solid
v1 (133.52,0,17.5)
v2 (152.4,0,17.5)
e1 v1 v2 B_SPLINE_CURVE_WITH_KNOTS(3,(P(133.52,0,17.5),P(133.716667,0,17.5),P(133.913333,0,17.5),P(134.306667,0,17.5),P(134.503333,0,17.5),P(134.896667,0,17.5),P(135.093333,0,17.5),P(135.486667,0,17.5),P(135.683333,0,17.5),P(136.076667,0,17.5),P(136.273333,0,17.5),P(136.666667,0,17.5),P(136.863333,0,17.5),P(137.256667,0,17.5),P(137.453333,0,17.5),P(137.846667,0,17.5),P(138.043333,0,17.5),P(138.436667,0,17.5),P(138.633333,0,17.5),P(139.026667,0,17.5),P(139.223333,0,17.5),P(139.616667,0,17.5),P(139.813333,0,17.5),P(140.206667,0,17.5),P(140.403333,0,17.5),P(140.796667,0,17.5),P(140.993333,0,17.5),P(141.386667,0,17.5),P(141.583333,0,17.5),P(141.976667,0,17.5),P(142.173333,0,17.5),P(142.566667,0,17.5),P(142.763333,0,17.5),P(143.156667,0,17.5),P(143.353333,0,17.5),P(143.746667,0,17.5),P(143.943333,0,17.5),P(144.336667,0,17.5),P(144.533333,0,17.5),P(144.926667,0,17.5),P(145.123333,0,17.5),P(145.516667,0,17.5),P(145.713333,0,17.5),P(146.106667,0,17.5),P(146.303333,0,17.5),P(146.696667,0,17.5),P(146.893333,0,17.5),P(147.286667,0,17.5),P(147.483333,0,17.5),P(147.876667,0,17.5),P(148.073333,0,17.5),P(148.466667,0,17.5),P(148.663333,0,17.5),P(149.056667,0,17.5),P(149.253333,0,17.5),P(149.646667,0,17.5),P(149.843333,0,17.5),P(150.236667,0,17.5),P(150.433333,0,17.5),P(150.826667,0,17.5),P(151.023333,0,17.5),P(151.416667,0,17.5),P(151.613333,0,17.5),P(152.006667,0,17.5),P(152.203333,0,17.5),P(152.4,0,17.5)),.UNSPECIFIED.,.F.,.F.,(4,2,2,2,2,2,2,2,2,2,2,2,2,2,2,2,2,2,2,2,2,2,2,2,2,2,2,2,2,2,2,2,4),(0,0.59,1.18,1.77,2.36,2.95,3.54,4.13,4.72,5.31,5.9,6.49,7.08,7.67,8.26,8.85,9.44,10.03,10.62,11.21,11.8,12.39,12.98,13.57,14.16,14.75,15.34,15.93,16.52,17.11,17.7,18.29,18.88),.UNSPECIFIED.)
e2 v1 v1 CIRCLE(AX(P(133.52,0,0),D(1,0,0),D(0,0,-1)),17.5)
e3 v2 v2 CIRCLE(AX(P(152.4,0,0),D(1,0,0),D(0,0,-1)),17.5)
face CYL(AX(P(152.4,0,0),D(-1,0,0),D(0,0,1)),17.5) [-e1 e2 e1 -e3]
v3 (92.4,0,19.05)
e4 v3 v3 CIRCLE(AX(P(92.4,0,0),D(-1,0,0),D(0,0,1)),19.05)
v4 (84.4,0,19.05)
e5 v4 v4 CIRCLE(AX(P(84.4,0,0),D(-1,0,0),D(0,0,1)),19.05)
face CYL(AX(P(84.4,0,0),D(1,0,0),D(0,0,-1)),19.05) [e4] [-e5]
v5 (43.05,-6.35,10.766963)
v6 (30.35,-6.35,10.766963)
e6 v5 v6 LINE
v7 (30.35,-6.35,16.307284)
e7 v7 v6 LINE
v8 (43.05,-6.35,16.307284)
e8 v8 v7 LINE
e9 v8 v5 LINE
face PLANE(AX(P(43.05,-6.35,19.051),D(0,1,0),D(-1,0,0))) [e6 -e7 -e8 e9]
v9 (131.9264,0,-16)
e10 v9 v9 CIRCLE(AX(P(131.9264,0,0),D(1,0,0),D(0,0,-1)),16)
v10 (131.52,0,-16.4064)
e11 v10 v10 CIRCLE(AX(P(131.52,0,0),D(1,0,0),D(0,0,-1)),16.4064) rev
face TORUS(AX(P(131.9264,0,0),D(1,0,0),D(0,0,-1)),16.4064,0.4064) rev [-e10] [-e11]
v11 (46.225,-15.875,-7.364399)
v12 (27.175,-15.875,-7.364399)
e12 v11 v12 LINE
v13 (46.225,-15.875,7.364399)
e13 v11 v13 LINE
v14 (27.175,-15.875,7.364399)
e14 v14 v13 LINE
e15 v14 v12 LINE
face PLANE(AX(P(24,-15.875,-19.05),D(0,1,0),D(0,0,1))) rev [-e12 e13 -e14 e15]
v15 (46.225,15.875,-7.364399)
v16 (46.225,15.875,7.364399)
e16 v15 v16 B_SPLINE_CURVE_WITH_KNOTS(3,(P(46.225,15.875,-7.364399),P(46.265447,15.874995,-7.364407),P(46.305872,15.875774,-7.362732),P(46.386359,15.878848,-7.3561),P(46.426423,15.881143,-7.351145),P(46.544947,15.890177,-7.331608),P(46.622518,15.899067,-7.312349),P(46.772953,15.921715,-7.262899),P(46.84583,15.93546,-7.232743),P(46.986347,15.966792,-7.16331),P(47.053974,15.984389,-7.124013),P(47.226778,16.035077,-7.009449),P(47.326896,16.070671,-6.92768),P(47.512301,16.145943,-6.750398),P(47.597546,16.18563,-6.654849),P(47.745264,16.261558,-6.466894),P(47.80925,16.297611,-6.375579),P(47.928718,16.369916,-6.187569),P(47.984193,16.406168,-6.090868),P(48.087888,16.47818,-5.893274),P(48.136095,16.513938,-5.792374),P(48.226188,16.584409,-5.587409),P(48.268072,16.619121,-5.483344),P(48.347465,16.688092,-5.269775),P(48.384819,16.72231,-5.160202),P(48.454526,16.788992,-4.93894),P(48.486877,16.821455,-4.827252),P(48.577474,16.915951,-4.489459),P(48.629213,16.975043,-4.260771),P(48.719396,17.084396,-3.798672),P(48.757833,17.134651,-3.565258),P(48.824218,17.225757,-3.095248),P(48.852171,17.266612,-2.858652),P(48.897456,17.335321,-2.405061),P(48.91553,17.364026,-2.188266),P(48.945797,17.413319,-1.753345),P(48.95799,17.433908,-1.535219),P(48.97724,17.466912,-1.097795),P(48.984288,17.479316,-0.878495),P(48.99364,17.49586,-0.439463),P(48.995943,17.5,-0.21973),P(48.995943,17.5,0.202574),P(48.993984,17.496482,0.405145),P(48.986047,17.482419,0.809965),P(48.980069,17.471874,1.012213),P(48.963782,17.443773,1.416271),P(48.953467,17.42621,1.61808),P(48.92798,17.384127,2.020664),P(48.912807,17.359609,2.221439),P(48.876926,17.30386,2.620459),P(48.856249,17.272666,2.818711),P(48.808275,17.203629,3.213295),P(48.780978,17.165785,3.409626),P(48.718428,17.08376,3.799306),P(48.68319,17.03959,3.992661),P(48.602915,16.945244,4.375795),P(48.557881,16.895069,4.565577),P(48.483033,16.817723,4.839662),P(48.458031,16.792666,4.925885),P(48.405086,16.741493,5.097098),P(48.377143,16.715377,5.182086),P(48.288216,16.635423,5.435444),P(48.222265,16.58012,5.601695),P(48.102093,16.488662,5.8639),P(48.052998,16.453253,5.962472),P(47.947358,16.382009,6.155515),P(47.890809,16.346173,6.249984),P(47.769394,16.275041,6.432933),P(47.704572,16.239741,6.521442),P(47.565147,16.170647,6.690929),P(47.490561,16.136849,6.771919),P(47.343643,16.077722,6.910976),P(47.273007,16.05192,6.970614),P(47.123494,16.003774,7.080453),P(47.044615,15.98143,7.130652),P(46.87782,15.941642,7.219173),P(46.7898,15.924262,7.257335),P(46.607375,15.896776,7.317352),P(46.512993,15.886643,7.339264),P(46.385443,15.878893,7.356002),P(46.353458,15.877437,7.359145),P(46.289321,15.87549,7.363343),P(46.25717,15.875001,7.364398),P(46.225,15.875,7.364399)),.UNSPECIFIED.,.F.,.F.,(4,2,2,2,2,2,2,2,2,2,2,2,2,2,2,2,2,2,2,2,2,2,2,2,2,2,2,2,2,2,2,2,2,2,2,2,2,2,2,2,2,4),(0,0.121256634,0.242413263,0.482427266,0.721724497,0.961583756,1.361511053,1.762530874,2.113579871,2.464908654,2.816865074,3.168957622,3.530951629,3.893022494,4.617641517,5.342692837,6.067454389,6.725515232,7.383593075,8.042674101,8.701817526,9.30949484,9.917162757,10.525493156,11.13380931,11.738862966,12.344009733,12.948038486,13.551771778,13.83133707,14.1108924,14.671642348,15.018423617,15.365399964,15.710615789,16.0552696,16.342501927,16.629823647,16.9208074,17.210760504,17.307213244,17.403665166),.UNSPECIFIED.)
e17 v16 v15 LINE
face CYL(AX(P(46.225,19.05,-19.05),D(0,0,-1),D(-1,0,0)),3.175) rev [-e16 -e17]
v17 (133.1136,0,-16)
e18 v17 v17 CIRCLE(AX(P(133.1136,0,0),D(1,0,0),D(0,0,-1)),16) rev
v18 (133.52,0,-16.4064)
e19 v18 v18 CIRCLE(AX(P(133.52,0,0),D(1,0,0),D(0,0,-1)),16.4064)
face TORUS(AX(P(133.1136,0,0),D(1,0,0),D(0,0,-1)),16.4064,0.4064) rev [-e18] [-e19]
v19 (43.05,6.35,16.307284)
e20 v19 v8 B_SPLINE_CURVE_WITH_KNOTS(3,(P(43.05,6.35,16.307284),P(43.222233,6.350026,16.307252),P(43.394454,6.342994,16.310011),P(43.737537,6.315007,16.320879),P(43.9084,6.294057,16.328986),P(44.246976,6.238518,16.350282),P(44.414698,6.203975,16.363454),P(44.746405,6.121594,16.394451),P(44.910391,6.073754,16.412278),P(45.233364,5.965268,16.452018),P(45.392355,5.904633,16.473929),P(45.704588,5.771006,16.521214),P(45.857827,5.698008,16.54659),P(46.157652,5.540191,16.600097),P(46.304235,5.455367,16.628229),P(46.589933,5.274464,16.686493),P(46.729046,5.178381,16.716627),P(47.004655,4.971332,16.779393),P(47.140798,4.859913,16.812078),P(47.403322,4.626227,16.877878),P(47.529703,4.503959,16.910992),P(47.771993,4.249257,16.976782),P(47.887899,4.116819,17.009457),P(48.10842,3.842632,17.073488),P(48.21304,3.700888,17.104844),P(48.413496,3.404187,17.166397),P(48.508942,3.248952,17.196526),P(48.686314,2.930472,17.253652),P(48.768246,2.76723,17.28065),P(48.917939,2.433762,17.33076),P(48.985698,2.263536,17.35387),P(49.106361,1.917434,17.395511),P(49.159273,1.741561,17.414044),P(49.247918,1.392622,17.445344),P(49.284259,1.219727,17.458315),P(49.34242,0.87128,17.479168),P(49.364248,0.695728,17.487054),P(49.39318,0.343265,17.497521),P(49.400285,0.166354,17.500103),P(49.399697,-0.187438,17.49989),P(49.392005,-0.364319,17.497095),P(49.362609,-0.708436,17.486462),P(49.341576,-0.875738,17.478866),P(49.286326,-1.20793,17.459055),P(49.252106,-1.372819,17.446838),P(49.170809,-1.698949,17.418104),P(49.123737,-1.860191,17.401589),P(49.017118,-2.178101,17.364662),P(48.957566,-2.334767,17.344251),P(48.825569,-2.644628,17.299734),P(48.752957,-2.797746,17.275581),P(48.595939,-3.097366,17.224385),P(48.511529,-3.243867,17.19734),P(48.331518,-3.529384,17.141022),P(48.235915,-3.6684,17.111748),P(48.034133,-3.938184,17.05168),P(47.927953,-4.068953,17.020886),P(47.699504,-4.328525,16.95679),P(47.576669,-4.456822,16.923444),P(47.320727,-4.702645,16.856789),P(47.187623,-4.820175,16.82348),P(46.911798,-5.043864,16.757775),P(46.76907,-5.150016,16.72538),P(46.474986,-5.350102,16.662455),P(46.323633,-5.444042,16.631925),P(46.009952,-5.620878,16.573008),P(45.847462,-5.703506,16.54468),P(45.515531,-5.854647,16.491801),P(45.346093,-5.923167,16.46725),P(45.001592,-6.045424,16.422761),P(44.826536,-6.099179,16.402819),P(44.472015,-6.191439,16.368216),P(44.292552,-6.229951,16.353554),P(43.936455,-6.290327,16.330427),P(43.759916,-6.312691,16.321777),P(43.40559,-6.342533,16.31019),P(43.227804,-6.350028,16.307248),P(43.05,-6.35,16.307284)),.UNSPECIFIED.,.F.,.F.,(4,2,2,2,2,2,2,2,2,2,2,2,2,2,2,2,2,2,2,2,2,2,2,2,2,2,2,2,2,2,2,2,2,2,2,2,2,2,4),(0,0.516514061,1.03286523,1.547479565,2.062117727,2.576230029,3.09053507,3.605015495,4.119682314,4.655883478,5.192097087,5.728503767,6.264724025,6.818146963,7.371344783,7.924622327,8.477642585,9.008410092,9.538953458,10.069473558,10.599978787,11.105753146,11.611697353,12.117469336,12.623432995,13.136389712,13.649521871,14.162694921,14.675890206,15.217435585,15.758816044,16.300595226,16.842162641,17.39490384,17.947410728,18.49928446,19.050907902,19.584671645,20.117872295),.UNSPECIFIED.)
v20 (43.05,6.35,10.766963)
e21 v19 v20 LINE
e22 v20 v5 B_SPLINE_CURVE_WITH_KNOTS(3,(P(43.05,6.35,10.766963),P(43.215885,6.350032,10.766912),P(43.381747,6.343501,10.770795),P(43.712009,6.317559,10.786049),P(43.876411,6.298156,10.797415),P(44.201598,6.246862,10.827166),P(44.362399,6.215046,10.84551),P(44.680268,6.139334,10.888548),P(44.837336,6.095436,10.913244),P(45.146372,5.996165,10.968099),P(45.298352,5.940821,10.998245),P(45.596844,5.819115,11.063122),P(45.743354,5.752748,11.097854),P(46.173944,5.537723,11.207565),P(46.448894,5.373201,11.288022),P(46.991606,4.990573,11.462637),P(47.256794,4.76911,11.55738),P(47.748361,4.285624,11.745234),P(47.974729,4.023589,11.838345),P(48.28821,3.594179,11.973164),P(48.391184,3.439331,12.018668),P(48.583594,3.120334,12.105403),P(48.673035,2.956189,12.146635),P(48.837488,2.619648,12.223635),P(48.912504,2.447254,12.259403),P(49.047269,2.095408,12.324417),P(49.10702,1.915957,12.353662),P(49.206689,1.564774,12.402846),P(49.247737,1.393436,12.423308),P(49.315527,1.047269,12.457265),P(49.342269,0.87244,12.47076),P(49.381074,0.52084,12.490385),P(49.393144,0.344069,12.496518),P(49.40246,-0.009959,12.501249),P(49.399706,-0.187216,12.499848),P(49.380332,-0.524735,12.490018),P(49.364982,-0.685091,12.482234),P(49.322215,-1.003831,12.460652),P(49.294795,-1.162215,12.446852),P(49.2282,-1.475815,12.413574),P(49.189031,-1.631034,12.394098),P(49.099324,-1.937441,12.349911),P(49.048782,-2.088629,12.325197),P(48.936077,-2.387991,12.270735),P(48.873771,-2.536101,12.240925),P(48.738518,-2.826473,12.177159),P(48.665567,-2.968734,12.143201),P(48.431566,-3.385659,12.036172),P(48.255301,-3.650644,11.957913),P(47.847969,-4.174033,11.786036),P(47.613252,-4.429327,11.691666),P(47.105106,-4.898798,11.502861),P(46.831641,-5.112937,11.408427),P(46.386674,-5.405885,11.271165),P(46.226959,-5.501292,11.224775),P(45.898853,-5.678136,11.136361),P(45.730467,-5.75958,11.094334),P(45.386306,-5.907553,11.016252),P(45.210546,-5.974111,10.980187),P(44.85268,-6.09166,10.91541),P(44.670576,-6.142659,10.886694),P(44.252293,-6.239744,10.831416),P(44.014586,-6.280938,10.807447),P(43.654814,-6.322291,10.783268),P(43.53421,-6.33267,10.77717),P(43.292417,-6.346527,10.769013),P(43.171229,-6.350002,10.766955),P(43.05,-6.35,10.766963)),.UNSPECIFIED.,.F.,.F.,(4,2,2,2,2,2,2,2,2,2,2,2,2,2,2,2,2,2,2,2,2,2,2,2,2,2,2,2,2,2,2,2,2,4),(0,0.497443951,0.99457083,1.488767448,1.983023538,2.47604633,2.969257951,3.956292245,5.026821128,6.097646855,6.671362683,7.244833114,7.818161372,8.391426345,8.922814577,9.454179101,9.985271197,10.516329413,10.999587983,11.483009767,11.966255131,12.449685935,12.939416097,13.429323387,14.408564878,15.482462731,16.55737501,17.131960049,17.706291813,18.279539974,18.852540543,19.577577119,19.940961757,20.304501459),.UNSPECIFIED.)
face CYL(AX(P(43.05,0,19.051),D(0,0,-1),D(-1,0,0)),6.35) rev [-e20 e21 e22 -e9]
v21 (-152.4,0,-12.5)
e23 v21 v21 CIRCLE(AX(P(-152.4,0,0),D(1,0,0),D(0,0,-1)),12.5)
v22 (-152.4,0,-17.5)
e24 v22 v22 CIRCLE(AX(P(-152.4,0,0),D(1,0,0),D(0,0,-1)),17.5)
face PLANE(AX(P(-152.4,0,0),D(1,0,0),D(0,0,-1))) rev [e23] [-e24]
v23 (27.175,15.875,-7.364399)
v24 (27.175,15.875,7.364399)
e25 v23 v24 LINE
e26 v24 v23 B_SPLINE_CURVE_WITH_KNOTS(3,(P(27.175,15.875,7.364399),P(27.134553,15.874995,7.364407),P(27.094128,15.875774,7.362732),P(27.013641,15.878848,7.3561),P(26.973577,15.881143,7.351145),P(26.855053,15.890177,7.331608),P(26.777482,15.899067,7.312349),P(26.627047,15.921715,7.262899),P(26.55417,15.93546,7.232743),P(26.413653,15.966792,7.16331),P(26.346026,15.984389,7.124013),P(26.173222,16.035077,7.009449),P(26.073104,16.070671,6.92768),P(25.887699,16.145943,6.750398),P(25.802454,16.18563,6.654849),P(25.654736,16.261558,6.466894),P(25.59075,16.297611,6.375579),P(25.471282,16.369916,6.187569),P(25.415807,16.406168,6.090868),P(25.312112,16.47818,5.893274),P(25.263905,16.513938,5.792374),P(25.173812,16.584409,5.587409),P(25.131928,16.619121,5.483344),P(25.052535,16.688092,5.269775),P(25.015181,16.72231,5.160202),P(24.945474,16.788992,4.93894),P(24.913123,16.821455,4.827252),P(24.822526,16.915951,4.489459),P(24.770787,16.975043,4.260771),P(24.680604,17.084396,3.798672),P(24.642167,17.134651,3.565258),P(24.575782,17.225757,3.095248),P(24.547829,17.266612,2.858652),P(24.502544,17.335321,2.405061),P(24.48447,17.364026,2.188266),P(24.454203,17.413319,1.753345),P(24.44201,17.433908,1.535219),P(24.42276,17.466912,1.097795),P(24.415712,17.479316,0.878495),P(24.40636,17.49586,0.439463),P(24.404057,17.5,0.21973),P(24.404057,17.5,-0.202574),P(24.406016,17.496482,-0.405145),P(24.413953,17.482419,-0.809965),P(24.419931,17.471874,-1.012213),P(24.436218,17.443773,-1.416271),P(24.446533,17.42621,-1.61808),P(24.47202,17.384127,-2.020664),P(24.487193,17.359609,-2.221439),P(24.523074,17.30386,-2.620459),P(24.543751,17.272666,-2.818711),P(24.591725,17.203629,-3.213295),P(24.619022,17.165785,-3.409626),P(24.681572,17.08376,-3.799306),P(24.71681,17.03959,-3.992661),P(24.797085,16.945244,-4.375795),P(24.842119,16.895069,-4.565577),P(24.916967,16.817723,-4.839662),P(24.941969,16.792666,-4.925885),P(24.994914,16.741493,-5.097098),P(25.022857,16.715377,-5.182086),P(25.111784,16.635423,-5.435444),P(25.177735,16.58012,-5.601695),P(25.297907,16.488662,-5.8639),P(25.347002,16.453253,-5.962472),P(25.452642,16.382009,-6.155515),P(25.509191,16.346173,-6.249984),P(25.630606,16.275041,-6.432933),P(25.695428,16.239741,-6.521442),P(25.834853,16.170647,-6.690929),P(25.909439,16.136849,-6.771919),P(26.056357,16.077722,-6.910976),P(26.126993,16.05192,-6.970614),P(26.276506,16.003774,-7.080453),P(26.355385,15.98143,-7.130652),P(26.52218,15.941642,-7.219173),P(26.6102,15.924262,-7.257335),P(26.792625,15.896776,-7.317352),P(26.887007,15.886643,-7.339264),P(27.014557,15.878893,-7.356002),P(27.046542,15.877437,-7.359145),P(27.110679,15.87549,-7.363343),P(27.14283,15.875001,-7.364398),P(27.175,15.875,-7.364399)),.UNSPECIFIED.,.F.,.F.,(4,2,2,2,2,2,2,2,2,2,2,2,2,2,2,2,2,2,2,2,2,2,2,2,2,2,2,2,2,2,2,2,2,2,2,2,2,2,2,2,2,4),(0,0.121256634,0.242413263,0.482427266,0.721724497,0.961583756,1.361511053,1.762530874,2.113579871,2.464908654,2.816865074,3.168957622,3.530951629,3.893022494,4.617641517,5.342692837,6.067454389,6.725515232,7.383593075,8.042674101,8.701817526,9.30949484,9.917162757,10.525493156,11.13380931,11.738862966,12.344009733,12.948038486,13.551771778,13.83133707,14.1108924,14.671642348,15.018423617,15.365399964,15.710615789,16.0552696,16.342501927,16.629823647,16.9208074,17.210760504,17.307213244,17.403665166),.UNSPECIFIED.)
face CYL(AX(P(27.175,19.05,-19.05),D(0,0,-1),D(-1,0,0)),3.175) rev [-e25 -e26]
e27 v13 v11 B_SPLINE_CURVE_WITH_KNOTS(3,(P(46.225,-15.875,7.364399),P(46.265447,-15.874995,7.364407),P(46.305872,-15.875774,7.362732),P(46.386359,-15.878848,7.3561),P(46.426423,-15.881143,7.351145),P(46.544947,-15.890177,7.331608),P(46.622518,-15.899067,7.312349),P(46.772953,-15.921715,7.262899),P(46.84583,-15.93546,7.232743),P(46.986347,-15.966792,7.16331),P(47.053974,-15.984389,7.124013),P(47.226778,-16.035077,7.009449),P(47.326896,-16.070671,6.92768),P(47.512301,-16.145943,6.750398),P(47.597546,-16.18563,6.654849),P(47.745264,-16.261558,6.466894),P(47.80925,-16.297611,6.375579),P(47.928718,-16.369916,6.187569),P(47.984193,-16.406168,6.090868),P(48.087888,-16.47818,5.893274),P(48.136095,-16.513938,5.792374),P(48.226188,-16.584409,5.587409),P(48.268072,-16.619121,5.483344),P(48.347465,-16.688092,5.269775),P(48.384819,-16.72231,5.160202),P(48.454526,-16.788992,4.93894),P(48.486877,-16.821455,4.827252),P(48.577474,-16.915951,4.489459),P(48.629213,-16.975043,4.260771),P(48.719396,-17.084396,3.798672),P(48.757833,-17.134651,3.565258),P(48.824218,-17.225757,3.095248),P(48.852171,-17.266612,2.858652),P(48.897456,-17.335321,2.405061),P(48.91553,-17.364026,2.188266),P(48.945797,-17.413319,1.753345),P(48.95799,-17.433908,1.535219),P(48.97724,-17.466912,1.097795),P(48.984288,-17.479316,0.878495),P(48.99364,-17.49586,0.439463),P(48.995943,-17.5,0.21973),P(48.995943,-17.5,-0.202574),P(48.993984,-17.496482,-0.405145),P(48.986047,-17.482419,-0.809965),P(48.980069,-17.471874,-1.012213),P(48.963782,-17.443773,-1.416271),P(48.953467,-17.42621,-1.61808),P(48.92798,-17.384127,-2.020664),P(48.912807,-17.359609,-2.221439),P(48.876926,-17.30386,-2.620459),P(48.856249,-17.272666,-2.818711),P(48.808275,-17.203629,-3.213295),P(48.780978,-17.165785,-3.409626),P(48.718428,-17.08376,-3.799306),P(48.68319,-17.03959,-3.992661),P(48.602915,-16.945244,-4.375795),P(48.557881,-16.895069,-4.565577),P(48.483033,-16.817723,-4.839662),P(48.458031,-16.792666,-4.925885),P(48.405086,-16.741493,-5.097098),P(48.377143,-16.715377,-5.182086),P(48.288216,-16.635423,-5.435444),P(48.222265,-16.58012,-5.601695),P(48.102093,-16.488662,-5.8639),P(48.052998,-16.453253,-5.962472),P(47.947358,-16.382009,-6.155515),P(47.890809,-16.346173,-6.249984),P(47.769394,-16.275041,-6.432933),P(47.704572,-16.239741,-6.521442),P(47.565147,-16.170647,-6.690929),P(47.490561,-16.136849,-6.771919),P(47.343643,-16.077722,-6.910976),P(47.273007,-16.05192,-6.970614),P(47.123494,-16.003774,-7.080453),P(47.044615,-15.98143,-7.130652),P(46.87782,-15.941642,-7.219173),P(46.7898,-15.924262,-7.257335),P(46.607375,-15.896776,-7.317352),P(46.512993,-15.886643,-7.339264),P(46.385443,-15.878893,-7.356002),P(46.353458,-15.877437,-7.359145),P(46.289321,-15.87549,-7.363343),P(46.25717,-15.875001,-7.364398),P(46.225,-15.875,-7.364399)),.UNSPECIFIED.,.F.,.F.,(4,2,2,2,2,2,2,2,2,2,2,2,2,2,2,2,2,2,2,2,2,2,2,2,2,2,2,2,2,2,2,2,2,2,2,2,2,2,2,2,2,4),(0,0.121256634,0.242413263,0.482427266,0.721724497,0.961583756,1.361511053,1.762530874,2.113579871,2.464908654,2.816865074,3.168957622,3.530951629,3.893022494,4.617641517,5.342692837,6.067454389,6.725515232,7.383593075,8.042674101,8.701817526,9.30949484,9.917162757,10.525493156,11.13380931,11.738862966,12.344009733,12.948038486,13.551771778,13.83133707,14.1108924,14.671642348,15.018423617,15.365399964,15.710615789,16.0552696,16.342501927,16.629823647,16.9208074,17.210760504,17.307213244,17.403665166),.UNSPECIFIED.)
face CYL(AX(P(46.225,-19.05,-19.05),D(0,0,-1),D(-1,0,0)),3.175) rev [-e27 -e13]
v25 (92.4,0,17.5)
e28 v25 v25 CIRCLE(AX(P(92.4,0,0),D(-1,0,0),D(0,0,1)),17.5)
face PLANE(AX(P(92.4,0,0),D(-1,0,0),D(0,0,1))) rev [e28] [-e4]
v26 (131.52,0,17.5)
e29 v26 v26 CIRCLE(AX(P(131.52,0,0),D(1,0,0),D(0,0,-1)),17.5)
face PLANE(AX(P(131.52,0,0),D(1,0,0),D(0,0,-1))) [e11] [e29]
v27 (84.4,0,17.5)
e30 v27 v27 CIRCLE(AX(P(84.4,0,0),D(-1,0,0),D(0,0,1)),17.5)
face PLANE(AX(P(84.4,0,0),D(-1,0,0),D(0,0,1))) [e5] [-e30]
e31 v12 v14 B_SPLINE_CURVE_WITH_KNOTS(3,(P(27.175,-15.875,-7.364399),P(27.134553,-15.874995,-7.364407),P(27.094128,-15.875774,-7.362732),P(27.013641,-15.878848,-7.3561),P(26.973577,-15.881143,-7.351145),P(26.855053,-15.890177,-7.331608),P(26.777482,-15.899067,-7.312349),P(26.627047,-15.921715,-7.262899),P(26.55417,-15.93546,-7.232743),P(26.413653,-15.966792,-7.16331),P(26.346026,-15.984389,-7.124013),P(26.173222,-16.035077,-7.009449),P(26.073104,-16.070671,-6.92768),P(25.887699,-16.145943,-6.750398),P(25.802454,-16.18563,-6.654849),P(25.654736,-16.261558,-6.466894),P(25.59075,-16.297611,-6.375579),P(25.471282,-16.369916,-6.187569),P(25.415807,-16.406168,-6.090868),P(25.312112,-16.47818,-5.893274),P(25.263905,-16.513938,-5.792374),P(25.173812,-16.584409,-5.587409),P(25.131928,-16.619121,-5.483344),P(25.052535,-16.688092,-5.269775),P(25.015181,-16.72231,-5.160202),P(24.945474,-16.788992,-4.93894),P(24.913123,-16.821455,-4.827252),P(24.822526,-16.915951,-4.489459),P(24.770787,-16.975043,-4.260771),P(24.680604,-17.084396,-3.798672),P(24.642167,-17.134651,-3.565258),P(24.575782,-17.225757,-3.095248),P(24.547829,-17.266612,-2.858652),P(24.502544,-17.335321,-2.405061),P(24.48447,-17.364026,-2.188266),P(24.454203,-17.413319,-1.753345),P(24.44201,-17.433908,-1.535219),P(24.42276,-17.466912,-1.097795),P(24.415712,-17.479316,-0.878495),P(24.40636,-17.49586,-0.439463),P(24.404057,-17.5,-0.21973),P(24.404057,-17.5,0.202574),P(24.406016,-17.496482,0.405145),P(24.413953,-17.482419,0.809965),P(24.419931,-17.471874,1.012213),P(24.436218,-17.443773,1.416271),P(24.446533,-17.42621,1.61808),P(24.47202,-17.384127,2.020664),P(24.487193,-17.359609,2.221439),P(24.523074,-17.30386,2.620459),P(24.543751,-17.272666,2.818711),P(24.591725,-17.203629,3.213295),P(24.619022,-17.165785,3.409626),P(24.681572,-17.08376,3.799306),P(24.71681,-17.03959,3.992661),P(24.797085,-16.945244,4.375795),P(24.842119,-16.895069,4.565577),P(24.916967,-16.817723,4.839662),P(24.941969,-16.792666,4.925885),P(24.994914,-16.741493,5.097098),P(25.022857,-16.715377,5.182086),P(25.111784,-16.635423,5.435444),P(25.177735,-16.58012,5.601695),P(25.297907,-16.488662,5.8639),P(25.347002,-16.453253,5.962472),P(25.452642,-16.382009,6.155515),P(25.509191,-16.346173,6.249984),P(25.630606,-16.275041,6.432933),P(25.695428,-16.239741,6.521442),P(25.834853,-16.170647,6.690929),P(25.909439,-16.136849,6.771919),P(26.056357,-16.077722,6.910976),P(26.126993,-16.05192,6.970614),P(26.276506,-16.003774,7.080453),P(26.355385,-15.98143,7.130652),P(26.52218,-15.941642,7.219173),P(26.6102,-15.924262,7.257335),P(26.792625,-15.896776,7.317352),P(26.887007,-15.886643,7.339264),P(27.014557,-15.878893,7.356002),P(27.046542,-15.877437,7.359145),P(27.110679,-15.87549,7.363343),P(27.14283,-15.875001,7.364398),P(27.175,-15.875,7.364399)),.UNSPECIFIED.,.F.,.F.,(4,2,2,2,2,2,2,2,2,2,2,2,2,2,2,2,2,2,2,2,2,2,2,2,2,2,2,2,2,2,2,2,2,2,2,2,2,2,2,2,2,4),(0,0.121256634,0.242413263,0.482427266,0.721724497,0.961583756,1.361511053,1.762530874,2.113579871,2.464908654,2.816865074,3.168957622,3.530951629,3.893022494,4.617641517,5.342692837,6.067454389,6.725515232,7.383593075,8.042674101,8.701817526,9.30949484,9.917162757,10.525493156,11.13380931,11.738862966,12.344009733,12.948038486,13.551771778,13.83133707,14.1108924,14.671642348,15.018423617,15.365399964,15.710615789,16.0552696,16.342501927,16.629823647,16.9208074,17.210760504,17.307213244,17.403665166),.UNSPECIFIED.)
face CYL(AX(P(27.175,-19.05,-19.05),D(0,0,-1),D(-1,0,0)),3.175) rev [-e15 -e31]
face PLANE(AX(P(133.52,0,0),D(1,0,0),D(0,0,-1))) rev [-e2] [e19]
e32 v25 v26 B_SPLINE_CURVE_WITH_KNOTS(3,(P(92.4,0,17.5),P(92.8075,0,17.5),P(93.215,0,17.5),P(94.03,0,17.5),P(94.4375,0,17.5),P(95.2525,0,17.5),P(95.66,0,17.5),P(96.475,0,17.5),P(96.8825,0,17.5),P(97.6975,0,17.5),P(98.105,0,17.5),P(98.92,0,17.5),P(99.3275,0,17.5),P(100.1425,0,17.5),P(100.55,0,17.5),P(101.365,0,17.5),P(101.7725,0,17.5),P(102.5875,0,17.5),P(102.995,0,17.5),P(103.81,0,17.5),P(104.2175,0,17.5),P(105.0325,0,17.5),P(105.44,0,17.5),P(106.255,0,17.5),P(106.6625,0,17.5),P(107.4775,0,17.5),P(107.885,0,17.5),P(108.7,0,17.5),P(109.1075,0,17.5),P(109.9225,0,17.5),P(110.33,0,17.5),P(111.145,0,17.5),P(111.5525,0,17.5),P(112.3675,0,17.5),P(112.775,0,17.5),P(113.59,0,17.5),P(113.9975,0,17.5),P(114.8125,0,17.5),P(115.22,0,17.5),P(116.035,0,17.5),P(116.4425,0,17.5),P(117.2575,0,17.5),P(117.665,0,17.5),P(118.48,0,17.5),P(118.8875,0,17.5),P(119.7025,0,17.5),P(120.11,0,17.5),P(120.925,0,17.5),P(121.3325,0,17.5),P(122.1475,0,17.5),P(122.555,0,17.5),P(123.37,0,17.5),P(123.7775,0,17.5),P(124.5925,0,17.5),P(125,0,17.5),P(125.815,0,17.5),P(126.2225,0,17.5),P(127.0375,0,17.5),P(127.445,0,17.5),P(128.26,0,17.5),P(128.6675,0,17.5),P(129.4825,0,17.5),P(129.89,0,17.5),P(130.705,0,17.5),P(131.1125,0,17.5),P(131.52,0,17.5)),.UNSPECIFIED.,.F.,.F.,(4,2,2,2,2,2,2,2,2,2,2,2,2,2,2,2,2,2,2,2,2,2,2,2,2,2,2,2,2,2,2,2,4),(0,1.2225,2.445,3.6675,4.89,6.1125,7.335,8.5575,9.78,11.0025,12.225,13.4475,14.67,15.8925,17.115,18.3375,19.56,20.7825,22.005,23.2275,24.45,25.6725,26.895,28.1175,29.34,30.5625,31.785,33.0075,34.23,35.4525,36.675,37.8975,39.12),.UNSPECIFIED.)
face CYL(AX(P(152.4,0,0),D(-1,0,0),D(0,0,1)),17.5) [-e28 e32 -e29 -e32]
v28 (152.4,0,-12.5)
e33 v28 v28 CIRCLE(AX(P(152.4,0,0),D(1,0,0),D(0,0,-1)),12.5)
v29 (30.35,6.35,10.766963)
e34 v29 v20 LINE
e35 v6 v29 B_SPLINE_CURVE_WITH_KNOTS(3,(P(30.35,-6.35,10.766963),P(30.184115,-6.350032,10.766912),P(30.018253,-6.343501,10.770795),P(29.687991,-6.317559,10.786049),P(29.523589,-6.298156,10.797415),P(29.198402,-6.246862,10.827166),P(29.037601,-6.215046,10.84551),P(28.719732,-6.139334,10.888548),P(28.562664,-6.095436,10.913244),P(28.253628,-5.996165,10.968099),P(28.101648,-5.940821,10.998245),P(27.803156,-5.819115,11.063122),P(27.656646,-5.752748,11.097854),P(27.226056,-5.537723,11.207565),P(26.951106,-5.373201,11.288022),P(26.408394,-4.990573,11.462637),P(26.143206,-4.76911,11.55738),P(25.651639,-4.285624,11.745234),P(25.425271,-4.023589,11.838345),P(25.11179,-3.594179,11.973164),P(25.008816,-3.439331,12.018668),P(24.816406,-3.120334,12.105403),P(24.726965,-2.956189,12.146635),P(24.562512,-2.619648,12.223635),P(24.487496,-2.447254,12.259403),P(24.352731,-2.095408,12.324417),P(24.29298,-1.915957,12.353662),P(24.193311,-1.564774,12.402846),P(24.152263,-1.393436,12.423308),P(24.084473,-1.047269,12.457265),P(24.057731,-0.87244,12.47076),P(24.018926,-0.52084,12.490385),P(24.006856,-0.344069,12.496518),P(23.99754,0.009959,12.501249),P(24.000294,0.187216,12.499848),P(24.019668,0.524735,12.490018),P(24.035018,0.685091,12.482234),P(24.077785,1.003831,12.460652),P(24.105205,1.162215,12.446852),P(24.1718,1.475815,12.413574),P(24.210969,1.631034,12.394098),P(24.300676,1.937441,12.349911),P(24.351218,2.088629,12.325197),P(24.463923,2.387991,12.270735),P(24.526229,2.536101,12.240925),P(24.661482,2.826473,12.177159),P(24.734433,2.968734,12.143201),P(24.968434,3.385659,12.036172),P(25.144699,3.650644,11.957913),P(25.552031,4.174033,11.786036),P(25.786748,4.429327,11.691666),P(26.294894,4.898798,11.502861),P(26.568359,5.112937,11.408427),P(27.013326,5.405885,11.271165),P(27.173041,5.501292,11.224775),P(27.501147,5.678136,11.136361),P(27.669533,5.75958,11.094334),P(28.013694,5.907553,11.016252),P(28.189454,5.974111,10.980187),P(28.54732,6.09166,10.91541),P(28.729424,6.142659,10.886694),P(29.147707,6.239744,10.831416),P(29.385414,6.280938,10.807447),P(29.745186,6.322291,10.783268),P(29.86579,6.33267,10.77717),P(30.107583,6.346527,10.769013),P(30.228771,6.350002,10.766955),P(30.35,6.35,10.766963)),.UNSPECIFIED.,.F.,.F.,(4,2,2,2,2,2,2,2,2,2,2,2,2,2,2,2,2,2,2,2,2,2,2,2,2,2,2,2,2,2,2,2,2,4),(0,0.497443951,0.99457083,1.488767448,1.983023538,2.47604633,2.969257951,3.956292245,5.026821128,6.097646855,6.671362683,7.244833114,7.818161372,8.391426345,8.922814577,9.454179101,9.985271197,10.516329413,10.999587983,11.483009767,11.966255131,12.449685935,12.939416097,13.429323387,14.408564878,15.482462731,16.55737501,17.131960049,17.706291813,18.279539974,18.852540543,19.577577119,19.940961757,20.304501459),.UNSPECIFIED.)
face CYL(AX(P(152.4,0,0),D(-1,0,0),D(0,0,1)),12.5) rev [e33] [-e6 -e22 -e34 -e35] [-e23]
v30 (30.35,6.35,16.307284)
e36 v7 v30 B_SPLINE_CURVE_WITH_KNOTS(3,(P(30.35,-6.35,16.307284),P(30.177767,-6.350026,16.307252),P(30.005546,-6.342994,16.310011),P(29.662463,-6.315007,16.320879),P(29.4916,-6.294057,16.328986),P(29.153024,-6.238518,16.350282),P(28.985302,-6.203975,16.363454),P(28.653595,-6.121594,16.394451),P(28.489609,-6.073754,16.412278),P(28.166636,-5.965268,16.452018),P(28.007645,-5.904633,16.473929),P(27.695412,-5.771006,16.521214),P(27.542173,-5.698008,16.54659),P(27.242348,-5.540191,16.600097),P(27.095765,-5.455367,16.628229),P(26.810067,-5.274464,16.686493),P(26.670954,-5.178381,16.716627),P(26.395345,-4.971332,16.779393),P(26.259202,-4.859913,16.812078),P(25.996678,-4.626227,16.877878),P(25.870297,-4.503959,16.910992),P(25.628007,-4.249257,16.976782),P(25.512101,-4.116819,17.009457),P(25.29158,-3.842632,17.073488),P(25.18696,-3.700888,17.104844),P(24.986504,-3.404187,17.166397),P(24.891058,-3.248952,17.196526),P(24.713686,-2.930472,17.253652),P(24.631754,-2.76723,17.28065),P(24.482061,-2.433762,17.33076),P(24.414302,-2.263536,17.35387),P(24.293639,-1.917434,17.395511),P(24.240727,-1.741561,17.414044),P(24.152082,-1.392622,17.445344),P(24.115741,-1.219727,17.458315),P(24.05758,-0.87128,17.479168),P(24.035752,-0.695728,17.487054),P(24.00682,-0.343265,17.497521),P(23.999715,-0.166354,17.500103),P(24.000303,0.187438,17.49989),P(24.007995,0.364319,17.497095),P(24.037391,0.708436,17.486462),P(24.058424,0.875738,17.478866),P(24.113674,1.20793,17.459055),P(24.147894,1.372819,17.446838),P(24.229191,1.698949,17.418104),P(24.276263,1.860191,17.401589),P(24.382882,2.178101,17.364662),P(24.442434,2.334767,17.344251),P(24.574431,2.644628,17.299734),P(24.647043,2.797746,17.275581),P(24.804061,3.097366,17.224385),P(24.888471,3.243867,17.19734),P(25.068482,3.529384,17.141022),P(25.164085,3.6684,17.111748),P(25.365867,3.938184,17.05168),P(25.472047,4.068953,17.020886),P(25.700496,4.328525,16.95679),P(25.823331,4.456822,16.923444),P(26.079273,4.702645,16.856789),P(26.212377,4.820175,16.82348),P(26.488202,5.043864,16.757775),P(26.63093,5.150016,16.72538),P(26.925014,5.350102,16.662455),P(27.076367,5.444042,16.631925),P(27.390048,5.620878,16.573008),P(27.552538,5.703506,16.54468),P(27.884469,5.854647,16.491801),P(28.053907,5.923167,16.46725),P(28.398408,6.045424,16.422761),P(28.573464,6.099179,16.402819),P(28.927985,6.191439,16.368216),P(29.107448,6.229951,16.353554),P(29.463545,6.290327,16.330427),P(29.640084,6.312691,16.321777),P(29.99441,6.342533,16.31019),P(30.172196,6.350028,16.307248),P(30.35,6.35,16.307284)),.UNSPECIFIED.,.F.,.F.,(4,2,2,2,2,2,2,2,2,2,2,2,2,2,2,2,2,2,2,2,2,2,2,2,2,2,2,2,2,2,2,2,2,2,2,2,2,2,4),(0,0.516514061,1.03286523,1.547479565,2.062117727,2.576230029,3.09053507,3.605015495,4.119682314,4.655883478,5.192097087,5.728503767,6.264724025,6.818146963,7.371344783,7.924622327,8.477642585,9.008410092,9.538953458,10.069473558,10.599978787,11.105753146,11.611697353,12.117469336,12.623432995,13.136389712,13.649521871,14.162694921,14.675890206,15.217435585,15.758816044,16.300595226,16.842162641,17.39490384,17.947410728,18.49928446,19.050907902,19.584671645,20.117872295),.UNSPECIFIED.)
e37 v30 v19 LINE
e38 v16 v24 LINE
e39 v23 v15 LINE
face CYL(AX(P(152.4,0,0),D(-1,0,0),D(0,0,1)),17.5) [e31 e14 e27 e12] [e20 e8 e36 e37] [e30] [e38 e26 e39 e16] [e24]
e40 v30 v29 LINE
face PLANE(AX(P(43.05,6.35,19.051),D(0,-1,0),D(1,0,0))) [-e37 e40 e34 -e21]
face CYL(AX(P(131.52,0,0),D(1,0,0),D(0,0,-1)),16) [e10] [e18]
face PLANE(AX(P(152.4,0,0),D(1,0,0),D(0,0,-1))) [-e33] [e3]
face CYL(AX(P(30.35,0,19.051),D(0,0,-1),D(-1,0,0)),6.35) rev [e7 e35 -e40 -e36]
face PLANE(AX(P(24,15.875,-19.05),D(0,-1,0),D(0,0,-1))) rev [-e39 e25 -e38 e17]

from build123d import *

# Parameters (mm, degrees)
SKETCH1_R               = 17.5
SKETCH1_R_2             = 12.5
BOSS_EXTRUDE1_DEPTH     = 152.4
SKETCH2_R               = 19.05
SKETCH2_R_2             = 17.5
BOSS_EXTRUDE2_DEPTH     = 8
SKETCH4_R               = 17.5
SKETCH4_R_2             = 16
CUT_EXTRUDE2_DEPTH      = 2
FILLET1_R               = 0.4064
CUT_EXTRUDE3_DEPTH      = 155.762931608
CUT_EXTRUDE3_DEPTH_BACK = 155.762931608
SKETCH8_W               = 25.4
SKETCH8_H               = 3.175
FILLET2_R               = 3.175
CUT_EXTRUDE4_REACH      = 156.763
CUT_EXTRUDE4_END_RADIUS = 17.5


with BuildPart() as part:
    # Sketch1 → Boss-Extrude1 (new, symmetric)
    with BuildSketch(Plane(origin=(0, 0, 0), x_dir=(0, 0, -1), z_dir=(1, 0, 0))):
        with Locations(Location((0, 0, 0), (0, 0, 180))):
            Circle(SKETCH1_R)
        with Locations(Location((0, 0, 0), (0, 0, 180))):
            Circle(SKETCH1_R_2, mode=Mode.SUBTRACT)
    extrude(amount=BOSS_EXTRUDE1_DEPTH, both=True)

    # Sketch2 → Boss-Extrude2 (add)
    with BuildSketch(Plane.ZY.offset(-92.4)):
        Circle(SKETCH2_R)
        Circle(SKETCH2_R_2, mode=Mode.SUBTRACT)
    extrude(amount=BOSS_EXTRUDE2_DEPTH)

    # Sketch4 → Cut-Extrude2 (cut)
    with BuildSketch(Plane(origin=(133.52, 0, 0), x_dir=(0, 0, -1), z_dir=(1, 0, 0))):
        with Locations(Location((0, 0, 0), (0, 0, 180))):
            Circle(SKETCH4_R)
        Circle(SKETCH4_R_2, mode=Mode.SUBTRACT)
    extrude(amount=-CUT_EXTRUDE2_DEPTH, mode=Mode.SUBTRACT)

    # Fillet1
    fillet1_edges = [part.edges().sort_by_distance(p)[0] for p in [
        (131.52, 0, 16),
        (133.52, 0, 16),
    ]]
    fillet(fillet1_edges, radius=FILLET1_R)

    # Sketch8 → Cut-Extrude3 (cut, two sides: drawn at the far end of the back side and taken through both)
    with BuildSketch(Plane.XY.offset(-CUT_EXTRUDE3_DEPTH_BACK)):
        with Locations((36.7, 17.4625)):
            Rectangle(SKETCH8_W, SKETCH8_H)
        with Locations((36.7, -17.4625)):
            Rectangle(SKETCH8_W, SKETCH8_H)
    extrude(amount=CUT_EXTRUDE3_DEPTH + CUT_EXTRUDE3_DEPTH_BACK, mode=Mode.SUBTRACT)

    # Fillet2
    # the kernel refuses this fillet: 3.175 mm, written as the material it adds along each edge
    with BuildSketch(Plane(origin=(49.4, -15.875, 15.301899161), x_dir=(-1, 0, 0), z_dir=(0, 0, -1))) as fillet2_piece_1_section:
        with BuildLine():
            CenterArc((FILLET2_R, -FILLET2_R), FILLET2_R, 90, 90)
            Line((0, -FILLET2_R), (0, 0))
            Line((0, 0), (FILLET2_R, 0))
        make_face()
    fillet2_piece_1 = extrude(amount=30.603798322, mode=Mode.PRIVATE)
    fillet2_piece_1 = fillet2_piece_1 & Plane(origin=(48.505622485, 0, 0), x_dir=(0, 0, 1), z_dir=(1, 0, 0)) * Cylinder(17.5, 74, mode=Mode.PRIVATE)
    add(fillet2_piece_1)
    with BuildSketch(Plane(origin=(24, -15.875, -15.301899161), x_dir=(1, 0, 0), z_dir=(0, 0, 1))) as fillet2_piece_2_section:
        with BuildLine():
            CenterArc((FILLET2_R, -FILLET2_R), FILLET2_R, 90, 90)
            Line((0, -FILLET2_R), (0, 0))
            Line((0, 0), (FILLET2_R, 0))
        make_face()
    fillet2_piece_2 = extrude(amount=30.603798322, mode=Mode.PRIVATE)
    fillet2_piece_2 = fillet2_piece_2 & Plane(origin=(24.894377515, 0, 0), x_dir=(0, 0, 1), z_dir=(1, 0, 0)) * Cylinder(17.5, 74, mode=Mode.PRIVATE)
    add(fillet2_piece_2)
    with BuildSketch(Plane(origin=(49.4, 15.875, 15.301899161), x_dir=(-1, 0, 0), z_dir=(0, 0, -1))) as fillet2_piece_3_section:
        with BuildLine():
            CenterArc((FILLET2_R, FILLET2_R), FILLET2_R, 180, 90)
            Line((0, FILLET2_R), (0, 0))
            Line((0, 0), (FILLET2_R, 0))
        make_face()
    fillet2_piece_3 = extrude(amount=30.603798322, mode=Mode.PRIVATE)
    fillet2_piece_3 = fillet2_piece_3 & Plane(origin=(48.50564536, 0, 0), x_dir=(0, 0, 1), z_dir=(1, 0, 0)) * Cylinder(17.5, 74, mode=Mode.PRIVATE)
    add(fillet2_piece_3)
    with BuildSketch(Plane(origin=(24, 15.875, -15.301899161), x_dir=(0, 1, 0), z_dir=(0, 0, 1))) as fillet2_piece_4_section:
        with BuildLine():
            CenterArc((FILLET2_R, -FILLET2_R), FILLET2_R, 90, 90)
            Line((0, -FILLET2_R), (0, 0))
            Line((0, 0), (FILLET2_R, 0))
        make_face()
    fillet2_piece_4 = extrude(amount=30.603798322, mode=Mode.PRIVATE)
    fillet2_piece_4 = fillet2_piece_4 & Plane(origin=(24.89438719, 0, 0), x_dir=(0, 0, 1), z_dir=(1, 0, 0)) * Cylinder(17.5, 74, mode=Mode.PRIVATE)
    add(fillet2_piece_4)

    # Cut-Extrude4: up to this cylinder (the profile starts inside it)
    cut_extrude4_end = Plane(origin=(36.7, 0, 0), z_dir=(-1, 0, 0)) * Cylinder(CUT_EXTRUDE4_END_RADIUS, 349.526, mode=Mode.PRIVATE)
    # Sketch9 → Cut-Extrude4 (cut, up to the surface)
    with BuildSketch(Plane.XY, mode=Mode.PRIVATE) as cut_extrude4_sk1:
        with BuildLine():
            Line((43.05, -6.35), (30.35, -6.35))
            ThreePointArc((30.35, -6.35), (24, 0), (30.35, 6.35))
            Line((30.35, 6.35), (43.05, 6.35))
            ThreePointArc((43.05, 6.35), (49.4, 0), (43.05, -6.35))
        make_face()
    cut_extrude4_tool1 = extrude(cut_extrude4_sk1.sketch, amount=CUT_EXTRUDE4_REACH, mode=Mode.PRIVATE) & cut_extrude4_end
    add(cut_extrude4_tool1.solids().sort_by_distance((36.7, 0, 0))[0], mode=Mode.SUBTRACT)


solid = part.part
